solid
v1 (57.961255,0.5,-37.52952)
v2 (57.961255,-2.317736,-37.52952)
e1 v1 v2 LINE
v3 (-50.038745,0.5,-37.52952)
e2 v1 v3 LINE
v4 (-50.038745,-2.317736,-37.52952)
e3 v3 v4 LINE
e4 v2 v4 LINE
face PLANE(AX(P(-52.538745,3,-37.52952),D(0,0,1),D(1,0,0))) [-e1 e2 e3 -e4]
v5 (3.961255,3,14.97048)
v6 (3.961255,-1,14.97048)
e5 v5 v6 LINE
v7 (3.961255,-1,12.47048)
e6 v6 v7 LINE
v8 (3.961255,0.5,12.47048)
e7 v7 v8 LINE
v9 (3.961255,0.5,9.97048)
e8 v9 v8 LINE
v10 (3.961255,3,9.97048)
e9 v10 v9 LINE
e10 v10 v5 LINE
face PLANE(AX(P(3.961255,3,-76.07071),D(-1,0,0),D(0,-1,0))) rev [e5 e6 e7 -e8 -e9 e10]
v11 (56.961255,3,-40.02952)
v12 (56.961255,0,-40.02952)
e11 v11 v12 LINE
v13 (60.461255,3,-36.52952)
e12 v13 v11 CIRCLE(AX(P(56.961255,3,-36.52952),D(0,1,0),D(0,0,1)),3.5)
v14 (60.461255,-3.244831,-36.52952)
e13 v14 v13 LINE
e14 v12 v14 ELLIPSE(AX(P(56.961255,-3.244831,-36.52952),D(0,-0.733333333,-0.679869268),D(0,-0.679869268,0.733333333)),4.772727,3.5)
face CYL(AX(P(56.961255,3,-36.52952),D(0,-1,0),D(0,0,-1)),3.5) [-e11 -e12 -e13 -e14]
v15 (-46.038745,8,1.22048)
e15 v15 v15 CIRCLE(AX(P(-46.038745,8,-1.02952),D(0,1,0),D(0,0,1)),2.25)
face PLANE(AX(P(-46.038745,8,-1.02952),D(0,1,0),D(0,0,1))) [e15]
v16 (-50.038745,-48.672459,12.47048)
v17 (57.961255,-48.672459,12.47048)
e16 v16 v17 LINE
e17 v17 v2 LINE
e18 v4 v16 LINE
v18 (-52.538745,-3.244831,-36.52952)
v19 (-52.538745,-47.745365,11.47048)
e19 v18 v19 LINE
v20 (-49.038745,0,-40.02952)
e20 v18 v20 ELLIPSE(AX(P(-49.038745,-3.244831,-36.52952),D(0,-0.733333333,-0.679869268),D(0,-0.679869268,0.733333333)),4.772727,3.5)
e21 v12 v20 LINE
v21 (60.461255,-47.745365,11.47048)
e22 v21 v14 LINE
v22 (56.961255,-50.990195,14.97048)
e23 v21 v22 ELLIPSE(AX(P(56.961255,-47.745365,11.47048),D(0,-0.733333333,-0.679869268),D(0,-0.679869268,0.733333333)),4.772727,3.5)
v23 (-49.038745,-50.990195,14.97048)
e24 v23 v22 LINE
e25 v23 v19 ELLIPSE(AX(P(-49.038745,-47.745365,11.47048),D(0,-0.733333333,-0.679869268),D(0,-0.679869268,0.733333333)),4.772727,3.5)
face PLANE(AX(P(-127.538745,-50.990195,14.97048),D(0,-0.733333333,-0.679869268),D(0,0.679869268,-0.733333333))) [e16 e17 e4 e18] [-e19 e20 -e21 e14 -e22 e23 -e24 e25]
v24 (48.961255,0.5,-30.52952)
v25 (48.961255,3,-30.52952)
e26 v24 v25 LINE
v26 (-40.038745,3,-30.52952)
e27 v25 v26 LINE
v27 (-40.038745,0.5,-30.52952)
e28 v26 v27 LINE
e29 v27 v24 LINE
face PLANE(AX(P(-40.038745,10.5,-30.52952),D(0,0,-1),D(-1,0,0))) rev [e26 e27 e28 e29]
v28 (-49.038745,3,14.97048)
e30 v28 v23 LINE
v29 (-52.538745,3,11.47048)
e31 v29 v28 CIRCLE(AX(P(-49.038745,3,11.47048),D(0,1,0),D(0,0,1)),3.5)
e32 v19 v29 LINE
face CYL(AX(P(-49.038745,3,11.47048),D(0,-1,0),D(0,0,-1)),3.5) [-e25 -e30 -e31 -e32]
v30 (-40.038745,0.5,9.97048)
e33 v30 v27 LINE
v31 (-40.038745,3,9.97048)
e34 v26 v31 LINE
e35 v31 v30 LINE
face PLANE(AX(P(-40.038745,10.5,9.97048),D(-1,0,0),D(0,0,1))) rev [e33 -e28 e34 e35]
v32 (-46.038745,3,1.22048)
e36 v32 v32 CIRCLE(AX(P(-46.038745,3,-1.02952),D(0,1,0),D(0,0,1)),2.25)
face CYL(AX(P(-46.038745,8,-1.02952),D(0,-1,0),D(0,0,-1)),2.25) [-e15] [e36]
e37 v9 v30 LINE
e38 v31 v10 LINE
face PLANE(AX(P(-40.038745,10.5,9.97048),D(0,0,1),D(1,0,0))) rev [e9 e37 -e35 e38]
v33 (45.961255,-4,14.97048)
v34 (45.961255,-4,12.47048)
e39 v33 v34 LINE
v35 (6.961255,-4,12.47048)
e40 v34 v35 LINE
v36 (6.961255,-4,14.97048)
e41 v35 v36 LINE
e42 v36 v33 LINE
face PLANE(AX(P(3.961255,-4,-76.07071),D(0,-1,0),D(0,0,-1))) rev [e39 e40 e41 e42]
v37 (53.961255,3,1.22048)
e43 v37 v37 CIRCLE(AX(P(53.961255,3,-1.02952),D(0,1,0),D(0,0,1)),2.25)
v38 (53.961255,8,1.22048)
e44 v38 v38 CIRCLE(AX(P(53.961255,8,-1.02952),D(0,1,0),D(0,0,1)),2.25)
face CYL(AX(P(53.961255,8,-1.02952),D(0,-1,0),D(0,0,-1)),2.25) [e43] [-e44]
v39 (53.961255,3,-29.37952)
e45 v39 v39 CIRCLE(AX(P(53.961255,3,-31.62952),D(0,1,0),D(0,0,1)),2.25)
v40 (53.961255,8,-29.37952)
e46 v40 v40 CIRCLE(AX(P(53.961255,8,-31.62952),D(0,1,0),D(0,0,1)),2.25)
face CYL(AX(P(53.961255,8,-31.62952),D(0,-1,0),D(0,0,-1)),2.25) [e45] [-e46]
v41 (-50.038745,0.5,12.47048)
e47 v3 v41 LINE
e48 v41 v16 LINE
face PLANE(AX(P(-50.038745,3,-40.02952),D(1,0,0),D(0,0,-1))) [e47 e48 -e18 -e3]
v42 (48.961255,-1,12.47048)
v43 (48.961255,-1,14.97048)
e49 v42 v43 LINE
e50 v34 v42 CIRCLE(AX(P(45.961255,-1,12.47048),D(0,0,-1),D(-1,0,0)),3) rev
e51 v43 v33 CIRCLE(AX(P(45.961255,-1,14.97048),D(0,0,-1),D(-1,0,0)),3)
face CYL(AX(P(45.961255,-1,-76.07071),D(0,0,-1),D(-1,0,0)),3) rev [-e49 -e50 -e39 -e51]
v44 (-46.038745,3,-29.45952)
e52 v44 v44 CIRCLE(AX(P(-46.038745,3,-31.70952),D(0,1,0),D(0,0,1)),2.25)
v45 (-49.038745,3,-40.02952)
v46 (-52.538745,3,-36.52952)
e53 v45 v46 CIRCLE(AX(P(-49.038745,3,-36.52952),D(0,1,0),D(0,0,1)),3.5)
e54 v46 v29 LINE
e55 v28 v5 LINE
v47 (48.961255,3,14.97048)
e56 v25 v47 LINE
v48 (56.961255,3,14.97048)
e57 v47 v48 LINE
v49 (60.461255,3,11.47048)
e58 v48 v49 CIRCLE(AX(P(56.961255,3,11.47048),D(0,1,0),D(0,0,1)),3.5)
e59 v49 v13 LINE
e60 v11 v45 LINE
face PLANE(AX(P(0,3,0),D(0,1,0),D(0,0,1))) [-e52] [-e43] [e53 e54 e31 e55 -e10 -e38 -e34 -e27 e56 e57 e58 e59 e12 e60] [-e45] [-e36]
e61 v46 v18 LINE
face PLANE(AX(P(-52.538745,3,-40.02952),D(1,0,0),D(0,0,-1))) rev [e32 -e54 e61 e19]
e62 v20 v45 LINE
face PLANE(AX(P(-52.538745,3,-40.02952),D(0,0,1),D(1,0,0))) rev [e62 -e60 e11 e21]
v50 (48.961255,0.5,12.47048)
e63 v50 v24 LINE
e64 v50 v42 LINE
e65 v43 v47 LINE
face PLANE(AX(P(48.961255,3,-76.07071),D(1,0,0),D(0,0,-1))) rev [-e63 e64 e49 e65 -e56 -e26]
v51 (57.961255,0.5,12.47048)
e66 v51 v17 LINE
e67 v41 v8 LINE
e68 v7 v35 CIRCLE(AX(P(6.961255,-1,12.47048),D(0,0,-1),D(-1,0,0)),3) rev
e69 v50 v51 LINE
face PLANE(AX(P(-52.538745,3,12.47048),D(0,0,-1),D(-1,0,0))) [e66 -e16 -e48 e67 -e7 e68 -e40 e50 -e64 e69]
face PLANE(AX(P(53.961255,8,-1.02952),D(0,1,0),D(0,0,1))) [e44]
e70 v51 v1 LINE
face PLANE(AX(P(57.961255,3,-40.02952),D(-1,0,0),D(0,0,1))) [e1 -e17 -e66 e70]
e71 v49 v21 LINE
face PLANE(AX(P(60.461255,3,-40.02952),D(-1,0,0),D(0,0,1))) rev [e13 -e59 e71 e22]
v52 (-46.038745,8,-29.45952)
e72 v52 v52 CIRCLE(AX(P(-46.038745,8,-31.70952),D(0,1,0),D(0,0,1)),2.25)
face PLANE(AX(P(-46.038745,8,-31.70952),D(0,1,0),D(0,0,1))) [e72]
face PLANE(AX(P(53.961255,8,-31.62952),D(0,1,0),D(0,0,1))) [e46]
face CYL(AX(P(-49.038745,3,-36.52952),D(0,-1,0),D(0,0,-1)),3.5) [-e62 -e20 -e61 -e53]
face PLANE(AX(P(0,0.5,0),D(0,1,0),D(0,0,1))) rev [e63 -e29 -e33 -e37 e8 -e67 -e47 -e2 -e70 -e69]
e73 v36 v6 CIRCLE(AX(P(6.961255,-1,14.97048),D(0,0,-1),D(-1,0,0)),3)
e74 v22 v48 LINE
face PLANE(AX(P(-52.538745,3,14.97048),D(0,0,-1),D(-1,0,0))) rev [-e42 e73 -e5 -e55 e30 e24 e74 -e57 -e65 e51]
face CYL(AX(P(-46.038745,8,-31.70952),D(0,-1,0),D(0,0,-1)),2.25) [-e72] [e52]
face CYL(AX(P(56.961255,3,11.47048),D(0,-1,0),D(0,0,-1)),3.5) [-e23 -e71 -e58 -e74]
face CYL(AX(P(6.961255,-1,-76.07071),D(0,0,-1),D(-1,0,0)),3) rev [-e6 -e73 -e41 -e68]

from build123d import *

# Parameters (mm, degrees)
SKETCH1_W           = 113
SKETCH1_H           = 55
BOSS_EXTRUDE1_DEPTH = 3
BOSS_EXTRUDE3_DEPTH = 113
SKETCH2_R           = 2.25
BOSS_EXTRUDE2_DEPTH = 5
SHELL1_START        = -50.038745387
SHELL1_DEPTH        = 108
SKETCH4_W           = 88
SKETCH4_H           = 40.5
CUT_EXTRUDE1_DEPTH  = 10
FILLET2_R           = 3.5
CUT_EXTRUDE2_REACH  = 98.336
SKETCH5_W           = 45
SKETCH5_H           = 7
FILLET3_R           = 3


# Read off the part's stored shape, not the designer's step: Shell1
with BuildPart() as part:
    # Sketch1 → Boss-Extrude1 (new body)
    with BuildSketch(Plane(origin=(0, 0, 0), x_dir=(1, 0, 0), z_dir=(0, 1, 0))):
        with Locations((3.961254613, 12.529520295)):
            Rectangle(SKETCH1_W, SKETCH1_H)
    extrude(amount=BOSS_EXTRUDE1_DEPTH)

    # Sketch3 → Boss-Extrude3 (add)
    with BuildSketch(Plane(origin=(60.461254613, 0, 0), x_dir=(0, 0, -1), z_dir=(1, 0, 0))):
        Polygon((-14.970479705, 0), (-14.970479705, -50.990195136), (40.029520295, 0), align=None)
    extrude(amount=-BOSS_EXTRUDE3_DEPTH)

    # Sketch2 → Boss-Extrude2 (add)
    with BuildSketch(Plane(origin=(0, 3, 0), x_dir=(1, 0, 0), z_dir=(0, 1, 0))):
        with Locations(Location((-46.038745387, 31.709520295, 0), (0, 0, 270))):
            Circle(SKETCH2_R)
        with Locations(Location((53.961254613, 31.629520295, 0), (0, 0, 270))):
            Circle(SKETCH2_R)
        with Locations(Location((53.961254613, 1.029520295, 0), (0, 0, 270))):
            Circle(SKETCH2_R)
        with Locations(Location((-46.038745387, 1.029520295, 0), (0, 0, 270))):
            Circle(SKETCH2_R)
    extrude(amount=BOSS_EXTRUDE2_DEPTH)

    # Shell1 outline → Shell1 (cut)
    with BuildSketch(Plane.YZ.offset(SHELL1_START)):
        Polygon((0.5, 12.470479705), (-48.672458993, 12.470479705), (-2.317736143, -37.529520295), (0.5, -37.529520295), align=None)
    extrude(amount=SHELL1_DEPTH, mode=Mode.SUBTRACT)

    # Sketch4 → Cut-Extrude1 (cut)
    with BuildSketch(Plane.XZ.offset(-0.5)):
        with Locations((3.961254613, -10.279520295)):
            Rectangle(SKETCH4_W, SKETCH4_H)
    extrude(amount=-CUT_EXTRUDE1_DEPTH, mode=Mode.SUBTRACT)

    # Fillet2
    fillet2_edges = [part.edges().sort_by_distance(p)[0] for p in [
        (-52.538745387, 1.5, -40.029520295),
        (60.461254613, 1.5, -40.029520295),
        (60.461254613, -23.995097568, 14.970479705),
        (-52.538745387, -23.995097568, 14.970479705),
    ]]
    fillet(fillet2_edges, radius=FILLET2_R)

    # Cut-Extrude2: up to this face of the body (flat: up to its plane)
    cut_extrude2_end = Plane(part.part.faces().sort_by_distance((3.961254613, 1.75, -30.529520295))[0])
    # Sketch5 → Cut-Extrude2 (cut, up to the picked face)
    with BuildSketch(Plane.XY.offset(14.970479705), mode=Mode.PRIVATE) as cut_extrude2_sk1:
        with Locations((26.461254613, -0.5)):
            Rectangle(SKETCH5_W, SKETCH5_H)
    cut_extrude2_tool1 = split(extrude(cut_extrude2_sk1.sketch, amount=-CUT_EXTRUDE2_REACH, mode=Mode.PRIVATE), bisect_by=cut_extrude2_end, keep=Keep.BOTH, mode=Mode.PRIVATE)
    add(cut_extrude2_tool1.solids().sort_by(Axis((26.461255, -0.5, 14.97048), (0, 0, -1)))[0], mode=Mode.SUBTRACT)

    # Fillet3
    fillet3_edges = [part.edges().sort_by_distance(p)[0] for p in [
        (48.961254613, -4, 13.720479705),
        (3.961254613, -4, 13.720479705),
    ]]
    fillet(fillet3_edges, radius=FILLET3_R)


solid = part.part
